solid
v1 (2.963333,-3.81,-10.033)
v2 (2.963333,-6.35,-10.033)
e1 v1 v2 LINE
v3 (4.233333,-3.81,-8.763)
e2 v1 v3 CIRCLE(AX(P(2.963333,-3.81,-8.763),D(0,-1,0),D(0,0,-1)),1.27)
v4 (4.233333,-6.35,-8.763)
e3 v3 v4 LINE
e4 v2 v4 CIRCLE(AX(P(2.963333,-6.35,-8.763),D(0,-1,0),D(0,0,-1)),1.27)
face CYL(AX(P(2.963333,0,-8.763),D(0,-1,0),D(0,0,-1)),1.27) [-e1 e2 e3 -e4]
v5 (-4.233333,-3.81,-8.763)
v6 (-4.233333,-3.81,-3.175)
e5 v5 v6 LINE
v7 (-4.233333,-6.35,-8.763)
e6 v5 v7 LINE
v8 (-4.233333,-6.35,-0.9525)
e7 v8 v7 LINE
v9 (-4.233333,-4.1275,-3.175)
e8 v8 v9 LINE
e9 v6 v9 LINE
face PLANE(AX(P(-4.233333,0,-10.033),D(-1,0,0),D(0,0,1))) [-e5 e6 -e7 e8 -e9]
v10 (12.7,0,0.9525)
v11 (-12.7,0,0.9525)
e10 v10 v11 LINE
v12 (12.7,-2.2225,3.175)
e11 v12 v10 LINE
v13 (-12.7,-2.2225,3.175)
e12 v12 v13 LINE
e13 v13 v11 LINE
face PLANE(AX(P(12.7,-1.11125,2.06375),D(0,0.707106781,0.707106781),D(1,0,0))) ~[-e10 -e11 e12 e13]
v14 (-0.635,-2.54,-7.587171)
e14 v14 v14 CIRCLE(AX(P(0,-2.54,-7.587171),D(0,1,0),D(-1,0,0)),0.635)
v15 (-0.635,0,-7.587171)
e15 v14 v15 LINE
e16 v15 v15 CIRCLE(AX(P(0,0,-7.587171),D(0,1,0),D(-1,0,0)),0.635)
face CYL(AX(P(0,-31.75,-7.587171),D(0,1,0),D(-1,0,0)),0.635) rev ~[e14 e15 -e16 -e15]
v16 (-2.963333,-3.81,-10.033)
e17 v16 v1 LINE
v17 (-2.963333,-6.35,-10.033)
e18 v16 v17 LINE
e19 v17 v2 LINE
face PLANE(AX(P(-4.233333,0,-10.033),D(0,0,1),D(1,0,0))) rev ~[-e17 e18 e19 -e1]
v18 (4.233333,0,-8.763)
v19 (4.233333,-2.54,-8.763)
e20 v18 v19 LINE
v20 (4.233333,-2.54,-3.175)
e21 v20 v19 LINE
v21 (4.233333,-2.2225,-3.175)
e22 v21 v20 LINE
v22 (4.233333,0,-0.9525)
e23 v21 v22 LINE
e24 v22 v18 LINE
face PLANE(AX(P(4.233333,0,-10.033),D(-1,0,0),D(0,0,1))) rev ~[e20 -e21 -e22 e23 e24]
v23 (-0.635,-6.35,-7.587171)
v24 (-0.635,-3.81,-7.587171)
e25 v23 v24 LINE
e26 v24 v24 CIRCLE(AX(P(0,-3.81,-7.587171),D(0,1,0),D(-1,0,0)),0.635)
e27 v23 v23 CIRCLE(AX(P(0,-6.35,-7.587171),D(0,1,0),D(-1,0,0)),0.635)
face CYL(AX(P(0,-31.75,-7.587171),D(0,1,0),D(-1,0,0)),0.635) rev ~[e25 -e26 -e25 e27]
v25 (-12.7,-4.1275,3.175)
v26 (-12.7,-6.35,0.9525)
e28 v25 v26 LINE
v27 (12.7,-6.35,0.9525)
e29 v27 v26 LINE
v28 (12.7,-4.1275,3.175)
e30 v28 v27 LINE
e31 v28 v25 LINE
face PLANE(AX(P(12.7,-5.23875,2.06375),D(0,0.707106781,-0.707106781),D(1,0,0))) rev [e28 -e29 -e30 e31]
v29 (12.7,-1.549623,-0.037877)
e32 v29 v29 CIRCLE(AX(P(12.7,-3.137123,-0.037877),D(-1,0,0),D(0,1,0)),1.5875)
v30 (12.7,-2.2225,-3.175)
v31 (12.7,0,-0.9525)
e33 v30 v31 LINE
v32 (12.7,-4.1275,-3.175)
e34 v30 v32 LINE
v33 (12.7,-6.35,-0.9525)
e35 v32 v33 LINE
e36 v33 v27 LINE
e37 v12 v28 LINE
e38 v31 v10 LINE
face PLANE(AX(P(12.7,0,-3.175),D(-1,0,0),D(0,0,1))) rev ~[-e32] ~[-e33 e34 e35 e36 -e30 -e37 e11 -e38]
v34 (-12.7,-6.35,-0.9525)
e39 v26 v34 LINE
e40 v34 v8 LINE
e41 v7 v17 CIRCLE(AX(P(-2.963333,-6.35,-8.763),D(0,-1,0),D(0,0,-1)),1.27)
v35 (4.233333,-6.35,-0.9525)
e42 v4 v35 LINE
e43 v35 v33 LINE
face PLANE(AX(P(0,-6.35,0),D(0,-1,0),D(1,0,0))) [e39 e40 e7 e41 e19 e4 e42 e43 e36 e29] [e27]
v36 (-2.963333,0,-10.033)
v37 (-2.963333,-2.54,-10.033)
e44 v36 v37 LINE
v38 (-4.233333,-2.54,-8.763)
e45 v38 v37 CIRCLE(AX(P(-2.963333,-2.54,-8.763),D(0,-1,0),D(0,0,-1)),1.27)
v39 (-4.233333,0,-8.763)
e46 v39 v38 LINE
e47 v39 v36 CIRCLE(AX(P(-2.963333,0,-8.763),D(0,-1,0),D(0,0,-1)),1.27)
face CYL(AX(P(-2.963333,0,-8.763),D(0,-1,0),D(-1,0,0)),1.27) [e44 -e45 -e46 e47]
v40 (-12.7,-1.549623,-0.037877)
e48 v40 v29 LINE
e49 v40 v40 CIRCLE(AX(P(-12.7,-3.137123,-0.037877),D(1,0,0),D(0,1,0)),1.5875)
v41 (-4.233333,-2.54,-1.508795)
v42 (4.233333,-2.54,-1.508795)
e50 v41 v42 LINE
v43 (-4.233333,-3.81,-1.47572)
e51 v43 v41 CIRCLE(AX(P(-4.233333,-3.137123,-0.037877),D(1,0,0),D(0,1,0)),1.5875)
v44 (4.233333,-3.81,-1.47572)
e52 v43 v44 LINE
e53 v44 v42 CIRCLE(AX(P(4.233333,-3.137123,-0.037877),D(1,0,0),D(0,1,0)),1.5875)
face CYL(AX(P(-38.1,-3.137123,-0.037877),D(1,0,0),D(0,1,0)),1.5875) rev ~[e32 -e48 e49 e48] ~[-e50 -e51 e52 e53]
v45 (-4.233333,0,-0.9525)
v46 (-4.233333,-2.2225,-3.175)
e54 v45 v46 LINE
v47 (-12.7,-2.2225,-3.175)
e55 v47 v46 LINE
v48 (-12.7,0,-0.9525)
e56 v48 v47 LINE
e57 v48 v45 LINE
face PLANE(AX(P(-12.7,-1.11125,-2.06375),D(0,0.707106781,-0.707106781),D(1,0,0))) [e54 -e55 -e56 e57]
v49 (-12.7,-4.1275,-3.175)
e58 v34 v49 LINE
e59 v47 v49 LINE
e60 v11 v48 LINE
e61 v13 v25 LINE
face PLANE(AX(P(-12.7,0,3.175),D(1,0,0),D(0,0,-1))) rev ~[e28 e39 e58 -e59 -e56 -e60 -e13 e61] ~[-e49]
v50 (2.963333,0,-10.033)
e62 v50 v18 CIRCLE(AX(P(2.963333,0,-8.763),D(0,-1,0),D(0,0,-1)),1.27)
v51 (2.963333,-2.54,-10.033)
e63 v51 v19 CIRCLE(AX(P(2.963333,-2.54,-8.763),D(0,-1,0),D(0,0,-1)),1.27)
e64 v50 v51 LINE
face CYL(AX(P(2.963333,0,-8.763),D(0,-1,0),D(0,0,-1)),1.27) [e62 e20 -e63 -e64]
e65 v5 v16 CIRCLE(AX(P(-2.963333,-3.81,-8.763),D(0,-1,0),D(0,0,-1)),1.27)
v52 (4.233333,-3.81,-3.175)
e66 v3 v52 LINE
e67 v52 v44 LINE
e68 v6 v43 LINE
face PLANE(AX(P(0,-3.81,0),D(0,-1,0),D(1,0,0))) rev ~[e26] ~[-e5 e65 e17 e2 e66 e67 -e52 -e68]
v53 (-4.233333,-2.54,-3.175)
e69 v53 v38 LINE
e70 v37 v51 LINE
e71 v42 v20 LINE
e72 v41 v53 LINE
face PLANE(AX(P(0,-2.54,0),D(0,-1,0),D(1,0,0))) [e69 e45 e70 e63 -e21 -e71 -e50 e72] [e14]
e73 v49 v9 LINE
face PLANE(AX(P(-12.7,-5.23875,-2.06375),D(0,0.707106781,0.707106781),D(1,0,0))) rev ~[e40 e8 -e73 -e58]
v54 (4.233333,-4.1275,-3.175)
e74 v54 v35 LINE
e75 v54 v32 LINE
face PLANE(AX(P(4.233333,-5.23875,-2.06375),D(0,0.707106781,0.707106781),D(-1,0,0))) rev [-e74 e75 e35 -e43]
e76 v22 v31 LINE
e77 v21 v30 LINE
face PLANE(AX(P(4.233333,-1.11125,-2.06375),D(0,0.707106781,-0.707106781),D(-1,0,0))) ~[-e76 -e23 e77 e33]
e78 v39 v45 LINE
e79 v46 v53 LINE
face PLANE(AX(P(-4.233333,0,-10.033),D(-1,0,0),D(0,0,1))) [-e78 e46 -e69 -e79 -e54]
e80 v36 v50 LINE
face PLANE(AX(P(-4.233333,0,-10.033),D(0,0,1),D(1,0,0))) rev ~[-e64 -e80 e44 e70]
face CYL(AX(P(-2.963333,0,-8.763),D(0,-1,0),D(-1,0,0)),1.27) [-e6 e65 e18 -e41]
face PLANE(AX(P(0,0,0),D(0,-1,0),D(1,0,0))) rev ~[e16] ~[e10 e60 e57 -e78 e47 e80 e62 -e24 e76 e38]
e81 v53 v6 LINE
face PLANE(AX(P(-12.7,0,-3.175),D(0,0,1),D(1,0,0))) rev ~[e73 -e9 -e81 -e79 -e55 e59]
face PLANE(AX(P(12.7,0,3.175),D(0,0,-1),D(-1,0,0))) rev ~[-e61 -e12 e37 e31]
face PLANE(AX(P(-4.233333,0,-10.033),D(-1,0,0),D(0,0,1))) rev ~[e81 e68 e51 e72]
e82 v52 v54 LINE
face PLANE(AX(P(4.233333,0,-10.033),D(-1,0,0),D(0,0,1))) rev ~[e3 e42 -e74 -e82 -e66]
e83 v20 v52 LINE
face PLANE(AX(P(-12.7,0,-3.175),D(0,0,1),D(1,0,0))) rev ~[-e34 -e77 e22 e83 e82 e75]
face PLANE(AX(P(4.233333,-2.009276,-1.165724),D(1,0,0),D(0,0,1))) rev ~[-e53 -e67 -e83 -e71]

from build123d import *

# Parameters (mm, degrees)
F1_DEPTH = 6.35
F0_W     = 8.4666666667
F0_H     = 6.858
F2_DEPTH = 6.35
F3_SIZE  = 2.2225
F4_R     = 1.27
F5_T     = 2.54
F7_D     = 3.175
F7_DEPTH = 25.4
F7_TIP   = 0.9538662327
F9_D     = 1.27
F9_DEPTH = 25.4
F9_TIP   = 0.3815464931


# Not quite as in the source:
# - a shell that OpenCascade refuses in one call is made with other operations: the cavity is built on its own and cut out


with BuildPart() as f1:
    # F0 (on Front) → F1 (new body)
    with BuildSketch(Plane.XZ):
        Polygon((12.7, -3.175), (12.7, 3.175), (-12.7, 3.175), (-12.7, -3.175), (-4.2333333333, -3.175), (4.2333333333, -3.175), align=None)
    extrude(amount=F1_DEPTH)

    # F0 (on Front) → F2 (join)
    with BuildSketch(Plane.XZ):
        with Locations((0, -6.604)):
            Rectangle(F0_W, F0_H)
    extrude(amount=F2_DEPTH)

    # F3
    f3_edges = [f1.edges().sort_by_distance(p)[0] for p in [
        (0, -6.35, 3.175),
        (8.466667, -6.35, -3.175),
        (-8.466667, -6.35, -3.175),
        (0, 0, 3.175),
        (8.466667, 0, -3.175),
        (-8.466667, 0, -3.175),
    ]]
    chamfer(f3_edges, length=F3_SIZE)

    # F4
    f4_edges = [f1.edges().sort_by_distance(p)[0] for p in [
        (-4.233333, -3.175, -10.033),
        (4.233333, -3.175, -10.033),
    ]]
    fillet(f4_edges, radius=F4_R)

    # F5: shell of thickness 2.54, made by hand


with BuildPart() as f5_core1:
    # F5_t2: copy of F1
    add(f1.part)

    # the walls: a layer under each face that stays
    f5_faces = [f5_core1.faces().sort_by_distance(p)[0] for p in [
        (0, 0, -4.54025),
        (8.4666666667, -1.11125, -2.06375),
        (12.7, -3.175, 0),
        (0, -1.11125, 2.06375),
        (-12.7, -3.175, 0),
        (-8.4666666667, -1.11125, -2.06375),
        (0, -6.35, -4.54025),
        (8.4666666667, -3.175, -3.175),
        (8.4666666667, -5.23875, -2.06375),
        (0, -5.23875, 2.06375),
        (0, -3.175, 3.175),
        (-8.4666666667, -3.175, -3.175),
        (-8.4666666667, -5.23875, -2.06375),
    ]]
    thicken(f5_faces, amount=-F5_T, mode=Mode.SUBTRACT)


with BuildPart() as f1_1:
    add(f1.part)

    # what is left inside the walls is the cavity
    f5_cavity = [f5_core1.part.solids().sort_by_distance(p)[0] for p in [
        (0, -2.5654, -6.721867),
    ]]
    add(f5_cavity, mode=Mode.SUBTRACT)

    # F7
    with Locations(Plane(origin=(-12.7, 0, 0), x_dir=(0, -1, 0), z_dir=(-1, 0, 0))):
        with Locations((3.1371232575, -0.0378767425)):
            Hole(F7_D / 2, depth=F7_DEPTH)
            with Locations((0, 0, -(F7_DEPTH + F7_TIP / 2))):  # 118° drill point
                Cone(0, F7_D / 2, F7_TIP, mode=Mode.SUBTRACT)

    # F9
    with Locations(Plane.XZ.offset(6.35)):
        with Locations((0, -7.5871711597)):
            Hole(F9_D / 2, depth=F9_DEPTH)
            with Locations((0, 0, -(F9_DEPTH + F9_TIP / 2))):  # 118° drill point
                Cone(0, F9_D / 2, F9_TIP, mode=Mode.SUBTRACT)


solid = f1_1.part
